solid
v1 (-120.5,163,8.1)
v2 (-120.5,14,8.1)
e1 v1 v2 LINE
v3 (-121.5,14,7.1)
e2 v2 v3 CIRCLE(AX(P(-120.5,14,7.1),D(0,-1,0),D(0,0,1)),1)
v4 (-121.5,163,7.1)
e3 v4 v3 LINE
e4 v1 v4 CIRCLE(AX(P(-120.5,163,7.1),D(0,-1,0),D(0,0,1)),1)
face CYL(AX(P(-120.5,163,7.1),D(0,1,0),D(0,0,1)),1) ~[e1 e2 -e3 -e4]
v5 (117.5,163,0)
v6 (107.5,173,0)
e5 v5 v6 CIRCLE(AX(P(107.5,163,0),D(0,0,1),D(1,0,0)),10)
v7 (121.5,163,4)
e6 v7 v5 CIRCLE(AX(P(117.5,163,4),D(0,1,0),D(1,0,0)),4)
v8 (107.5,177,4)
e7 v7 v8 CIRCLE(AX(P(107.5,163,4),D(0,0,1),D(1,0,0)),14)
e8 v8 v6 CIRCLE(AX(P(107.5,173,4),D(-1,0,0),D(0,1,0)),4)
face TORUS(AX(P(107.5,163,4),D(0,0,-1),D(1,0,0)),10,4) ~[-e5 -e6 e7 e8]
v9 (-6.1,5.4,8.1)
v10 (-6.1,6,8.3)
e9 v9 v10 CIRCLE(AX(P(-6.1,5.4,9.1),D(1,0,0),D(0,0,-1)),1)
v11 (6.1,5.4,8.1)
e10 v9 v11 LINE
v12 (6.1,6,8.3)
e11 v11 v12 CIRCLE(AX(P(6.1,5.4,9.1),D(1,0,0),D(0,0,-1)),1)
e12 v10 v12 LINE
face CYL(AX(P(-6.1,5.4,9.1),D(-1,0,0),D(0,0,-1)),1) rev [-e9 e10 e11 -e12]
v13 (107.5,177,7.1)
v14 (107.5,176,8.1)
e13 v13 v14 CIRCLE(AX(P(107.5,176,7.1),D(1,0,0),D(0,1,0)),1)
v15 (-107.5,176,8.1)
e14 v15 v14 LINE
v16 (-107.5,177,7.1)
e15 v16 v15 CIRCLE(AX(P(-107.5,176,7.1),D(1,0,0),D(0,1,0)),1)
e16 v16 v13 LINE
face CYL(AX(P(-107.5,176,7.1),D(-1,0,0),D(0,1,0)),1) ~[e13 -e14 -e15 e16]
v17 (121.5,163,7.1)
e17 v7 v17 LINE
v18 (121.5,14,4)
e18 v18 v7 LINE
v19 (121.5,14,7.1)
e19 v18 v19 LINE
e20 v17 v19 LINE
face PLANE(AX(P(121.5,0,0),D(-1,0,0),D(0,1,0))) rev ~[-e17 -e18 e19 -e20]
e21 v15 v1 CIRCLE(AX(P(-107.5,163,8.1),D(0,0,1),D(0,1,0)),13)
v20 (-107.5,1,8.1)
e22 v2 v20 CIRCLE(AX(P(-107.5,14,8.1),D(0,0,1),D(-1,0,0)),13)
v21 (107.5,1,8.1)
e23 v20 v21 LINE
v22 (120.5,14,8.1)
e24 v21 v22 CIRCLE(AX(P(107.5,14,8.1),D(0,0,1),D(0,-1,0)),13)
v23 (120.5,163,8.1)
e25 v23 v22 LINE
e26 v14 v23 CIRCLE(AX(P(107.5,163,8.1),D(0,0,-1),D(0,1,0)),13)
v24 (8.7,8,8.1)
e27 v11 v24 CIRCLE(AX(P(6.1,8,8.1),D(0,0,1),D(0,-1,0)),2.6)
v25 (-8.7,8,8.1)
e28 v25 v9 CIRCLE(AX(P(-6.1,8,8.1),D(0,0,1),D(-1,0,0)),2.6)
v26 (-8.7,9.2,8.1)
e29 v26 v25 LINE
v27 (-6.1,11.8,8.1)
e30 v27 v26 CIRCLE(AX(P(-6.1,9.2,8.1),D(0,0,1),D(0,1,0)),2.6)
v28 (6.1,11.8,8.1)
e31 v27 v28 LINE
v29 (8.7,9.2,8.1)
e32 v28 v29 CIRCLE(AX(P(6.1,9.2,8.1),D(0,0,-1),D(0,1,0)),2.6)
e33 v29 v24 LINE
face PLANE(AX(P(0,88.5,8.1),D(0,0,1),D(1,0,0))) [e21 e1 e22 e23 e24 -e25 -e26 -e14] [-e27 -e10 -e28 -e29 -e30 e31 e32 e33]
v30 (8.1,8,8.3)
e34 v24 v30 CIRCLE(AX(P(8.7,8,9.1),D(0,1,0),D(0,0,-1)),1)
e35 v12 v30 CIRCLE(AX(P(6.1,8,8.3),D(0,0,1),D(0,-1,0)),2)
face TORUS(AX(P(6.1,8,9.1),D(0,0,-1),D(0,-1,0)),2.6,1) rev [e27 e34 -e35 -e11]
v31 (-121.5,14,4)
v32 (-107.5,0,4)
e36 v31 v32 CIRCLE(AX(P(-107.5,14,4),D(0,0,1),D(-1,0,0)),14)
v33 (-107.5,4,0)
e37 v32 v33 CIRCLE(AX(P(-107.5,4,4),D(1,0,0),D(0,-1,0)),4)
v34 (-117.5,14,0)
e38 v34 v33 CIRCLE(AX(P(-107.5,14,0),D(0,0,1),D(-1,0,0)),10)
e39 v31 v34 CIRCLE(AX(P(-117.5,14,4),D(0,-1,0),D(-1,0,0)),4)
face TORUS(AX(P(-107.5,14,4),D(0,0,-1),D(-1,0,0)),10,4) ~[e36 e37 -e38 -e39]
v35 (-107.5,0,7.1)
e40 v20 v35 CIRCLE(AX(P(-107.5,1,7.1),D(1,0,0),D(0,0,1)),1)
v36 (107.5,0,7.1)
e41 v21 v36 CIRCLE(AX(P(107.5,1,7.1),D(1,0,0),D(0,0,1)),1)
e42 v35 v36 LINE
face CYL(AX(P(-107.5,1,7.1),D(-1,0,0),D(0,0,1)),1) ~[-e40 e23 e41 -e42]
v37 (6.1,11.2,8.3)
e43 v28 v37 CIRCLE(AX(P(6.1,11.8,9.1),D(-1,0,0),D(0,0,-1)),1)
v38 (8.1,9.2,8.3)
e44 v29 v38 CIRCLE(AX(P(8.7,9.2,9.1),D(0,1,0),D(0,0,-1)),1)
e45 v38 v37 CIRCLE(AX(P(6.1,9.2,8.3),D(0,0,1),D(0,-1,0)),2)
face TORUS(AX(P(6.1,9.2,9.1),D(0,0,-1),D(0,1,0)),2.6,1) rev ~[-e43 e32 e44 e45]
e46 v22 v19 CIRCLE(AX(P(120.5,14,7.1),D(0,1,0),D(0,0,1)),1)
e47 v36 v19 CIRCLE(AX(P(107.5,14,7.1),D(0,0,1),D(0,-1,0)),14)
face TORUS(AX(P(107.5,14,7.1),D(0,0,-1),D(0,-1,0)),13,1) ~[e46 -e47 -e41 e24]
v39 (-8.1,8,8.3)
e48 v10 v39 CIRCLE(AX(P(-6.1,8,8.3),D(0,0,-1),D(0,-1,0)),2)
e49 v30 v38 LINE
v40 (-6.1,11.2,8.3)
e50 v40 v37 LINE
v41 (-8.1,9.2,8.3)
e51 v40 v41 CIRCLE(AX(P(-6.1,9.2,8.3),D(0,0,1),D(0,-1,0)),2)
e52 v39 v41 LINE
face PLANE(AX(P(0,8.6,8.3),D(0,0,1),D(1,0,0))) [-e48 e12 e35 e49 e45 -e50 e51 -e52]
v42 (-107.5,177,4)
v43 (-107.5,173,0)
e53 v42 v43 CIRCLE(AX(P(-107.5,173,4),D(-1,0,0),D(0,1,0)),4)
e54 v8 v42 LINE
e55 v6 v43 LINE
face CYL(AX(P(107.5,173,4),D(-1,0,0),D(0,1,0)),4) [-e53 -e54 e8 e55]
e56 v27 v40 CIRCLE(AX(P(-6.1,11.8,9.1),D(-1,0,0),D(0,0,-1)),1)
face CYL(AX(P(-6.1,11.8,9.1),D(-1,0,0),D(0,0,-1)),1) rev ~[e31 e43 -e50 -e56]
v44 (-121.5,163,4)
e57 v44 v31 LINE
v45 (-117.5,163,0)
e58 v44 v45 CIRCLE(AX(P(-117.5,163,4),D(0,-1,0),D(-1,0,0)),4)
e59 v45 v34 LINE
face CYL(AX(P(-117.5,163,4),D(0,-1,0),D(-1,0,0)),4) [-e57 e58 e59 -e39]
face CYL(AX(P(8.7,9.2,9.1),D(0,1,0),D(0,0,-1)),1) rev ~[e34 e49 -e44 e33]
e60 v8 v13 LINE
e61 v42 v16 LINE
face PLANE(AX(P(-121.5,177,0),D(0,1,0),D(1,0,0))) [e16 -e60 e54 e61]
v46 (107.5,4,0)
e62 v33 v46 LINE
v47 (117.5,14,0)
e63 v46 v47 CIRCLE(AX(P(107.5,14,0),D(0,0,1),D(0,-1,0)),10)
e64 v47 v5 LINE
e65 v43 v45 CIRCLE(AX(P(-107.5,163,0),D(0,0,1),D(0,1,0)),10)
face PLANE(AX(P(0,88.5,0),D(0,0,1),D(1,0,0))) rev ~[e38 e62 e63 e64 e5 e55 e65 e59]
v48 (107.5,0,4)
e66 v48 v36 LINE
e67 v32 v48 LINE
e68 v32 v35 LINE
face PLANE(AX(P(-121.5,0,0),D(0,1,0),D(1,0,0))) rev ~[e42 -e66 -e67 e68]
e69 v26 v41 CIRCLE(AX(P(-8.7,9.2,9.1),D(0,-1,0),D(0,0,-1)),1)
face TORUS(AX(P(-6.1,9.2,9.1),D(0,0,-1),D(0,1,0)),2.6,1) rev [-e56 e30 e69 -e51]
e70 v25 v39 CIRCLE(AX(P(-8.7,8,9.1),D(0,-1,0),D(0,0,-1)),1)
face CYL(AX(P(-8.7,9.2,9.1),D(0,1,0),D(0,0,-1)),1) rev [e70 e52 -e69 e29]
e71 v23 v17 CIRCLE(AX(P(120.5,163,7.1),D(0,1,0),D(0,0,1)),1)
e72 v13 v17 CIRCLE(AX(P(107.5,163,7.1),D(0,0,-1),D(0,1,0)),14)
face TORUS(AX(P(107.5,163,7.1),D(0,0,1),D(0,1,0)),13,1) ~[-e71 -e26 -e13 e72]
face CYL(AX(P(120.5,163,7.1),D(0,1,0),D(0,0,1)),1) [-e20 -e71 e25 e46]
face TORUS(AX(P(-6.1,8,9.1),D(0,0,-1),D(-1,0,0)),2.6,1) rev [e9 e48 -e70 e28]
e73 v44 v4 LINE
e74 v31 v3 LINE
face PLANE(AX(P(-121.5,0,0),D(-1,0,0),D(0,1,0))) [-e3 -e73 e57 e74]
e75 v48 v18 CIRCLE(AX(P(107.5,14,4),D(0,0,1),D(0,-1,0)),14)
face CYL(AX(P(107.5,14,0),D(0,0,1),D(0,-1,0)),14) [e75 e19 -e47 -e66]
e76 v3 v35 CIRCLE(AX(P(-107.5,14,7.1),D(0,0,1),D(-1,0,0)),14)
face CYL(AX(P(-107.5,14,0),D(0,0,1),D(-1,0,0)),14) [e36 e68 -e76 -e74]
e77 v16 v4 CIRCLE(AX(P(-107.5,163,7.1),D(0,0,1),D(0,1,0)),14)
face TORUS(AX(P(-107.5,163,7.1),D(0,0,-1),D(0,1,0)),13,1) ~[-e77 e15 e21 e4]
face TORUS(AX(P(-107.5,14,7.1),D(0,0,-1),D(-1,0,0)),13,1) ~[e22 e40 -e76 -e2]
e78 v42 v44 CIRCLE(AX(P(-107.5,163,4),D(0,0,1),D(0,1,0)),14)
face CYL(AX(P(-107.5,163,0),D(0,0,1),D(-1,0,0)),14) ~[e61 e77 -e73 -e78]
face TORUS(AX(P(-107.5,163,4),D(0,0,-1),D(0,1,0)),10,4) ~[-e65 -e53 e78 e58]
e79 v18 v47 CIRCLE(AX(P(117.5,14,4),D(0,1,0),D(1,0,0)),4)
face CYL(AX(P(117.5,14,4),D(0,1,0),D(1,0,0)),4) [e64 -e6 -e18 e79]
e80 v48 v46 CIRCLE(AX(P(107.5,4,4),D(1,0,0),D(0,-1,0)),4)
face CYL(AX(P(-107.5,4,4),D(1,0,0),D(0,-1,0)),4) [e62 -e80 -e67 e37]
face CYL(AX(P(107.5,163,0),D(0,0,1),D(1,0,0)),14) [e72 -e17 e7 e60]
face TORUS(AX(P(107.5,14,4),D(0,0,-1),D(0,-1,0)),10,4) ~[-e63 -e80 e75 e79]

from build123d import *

# Parameters (mm, degrees)
F0_W         = 243
F0_H         = 177
F1_DEPTH     = 8.1
F2_R         = 14
F3_W         = 16.2
F3_H         = 5.2
F4_DEPTH     = 0.2
F5_R         = 2
F6_R         = 4
F7_T1_DEPTH  = 12.2
F7_T3_DEPTH  = 1.2
F7_T6_ANGLE  = 90
F7_T8_ANGLE  = 90
F7_T10_ANGLE = 90
F7_T12_ANGLE = 90
F7_T13_DEPTH = 215
F7_T15_DEPTH = 149
F7_T18_ANGLE = 90
F7_T20_ANGLE = 90
F7_T22_ANGLE = 90
F7_T24_ANGLE = 90


# Not quite as in the source:
# - a fillet or chamfer that OpenCascade refuses, or shapes differently, is made with other operations: its cross-section is extruded or revolved along the edge and cut away or added


with BuildPart() as f1:
    # F0 (on Top) → F1 (new body)
    with BuildSketch(Plane.XY):
        with Locations((0, 88.5)):
            Rectangle(F0_W, F0_H)
    extrude(amount=F1_DEPTH)

    # F2
    f2_edges = [f1.edges().sort_by_distance(p)[0] for p in [
        (-121.5, 0, 4.05),
        (121.5, 0, 4.05),
        (121.5, 177, 4.05),
        (-121.5, 177, 4.05),
    ]]
    fillet(f2_edges, radius=F2_R)

    # F3 (on face) → F4 (join)
    with BuildSketch(Plane.XY.offset(8.1)):
        with Locations((0, 8.6)):
            Rectangle(F3_W, F3_H)
    extrude(amount=F4_DEPTH)

    # F5
    f5_edges = [f1.edges().sort_by_distance(p)[0] for p in [
        (8.1, 6, 8.2),
        (8.1, 11.2, 8.2),
        (-8.1, 6, 8.2),
        (-8.1, 11.2, 8.2),
    ]]
    fillet(f5_edges, radius=F5_R)

    # F6
    f6_edges = [f1.edges().sort_by_distance(p)[0] for p in [
        (121.5, 88.5, 0),
        (0, 177, 0),
        (117.399495, 172.899495, 0),
        (-117.399495, 172.899495, 0),
        (-121.5, 88.5, 0),
        (117.399495, 4.100505, 0),
        (-117.399495, 4.100505, 0),
        (0, 0, 0),
    ]]
    fillet(f6_edges, radius=F6_R)

    # F7: fillet of radius 1 on 16 edges, made by hand

    # F7_s2 → F7_t1 (join)
    with BuildSketch(Plane.YZ.offset(-6.1)):
        with BuildLine():
            ThreePointArc((11.8, 8.1), (11.483772234, 8.1513167019), (11.2, 8.3))
            Line((11.2, 8.3), (11.2, 8.1))
            Line((11.2, 8.1), (11.8, 8.1))
        make_face()
        with BuildLine():
            ThreePointArc((5.4, 8.1), (5.716227766, 8.1513167019), (6, 8.3))
            Line((6, 8.3), (6, 8.1))
            Line((6, 8.1), (5.4, 8.1))
        make_face()
    extrude(amount=F7_T1_DEPTH)

    # F7_s4 → F7_t3 (join)
    with BuildSketch(Plane.XZ.offset(-9.2)):
        with BuildLine():
            ThreePointArc((8.7, 8.1), (8.383772234, 8.1513167019), (8.1, 8.3))
            Line((8.1, 8.3), (8.1, 8.1))
            Line((8.1, 8.1), (8.7, 8.1))
        make_face()
        with BuildLine():
            ThreePointArc((-8.7, 8.1), (-8.383772234, 8.1513167019), (-8.1, 8.3))
            Line((-8.1, 8.3), (-8.1, 8.1))
            Line((-8.1, 8.1), (-8.7, 8.1))
        make_face()
    extrude(amount=F7_T3_DEPTH)

    # F7_s5 → F7_t6 (revolve)
    with BuildSketch(Plane.YZ.offset(6.1)):
        with BuildLine():
            ThreePointArc((11.8, 8.1), (11.483772234, 8.1513167019), (11.2, 8.3))
            Line((11.2, 8.3), (11.2, 8.1))
            Line((11.2, 8.1), (11.8, 8.1))
        make_face()
    revolve(axis=Axis((6.1, 9.2, 8.1), (0, 0, -1)), revolution_arc=F7_T6_ANGLE)

    # F7_s7 → F7_t8 (revolve)
    with BuildSketch(Plane.YZ.offset(-6.1)):
        with BuildLine():
            ThreePointArc((11.8, 8.1), (11.483772234, 8.1513167019), (11.2, 8.3))
            Line((11.2, 8.3), (11.2, 8.1))
            Line((11.2, 8.1), (11.8, 8.1))
        make_face()
    revolve(axis=Axis((-6.1, 9.2, 8.1), (0, 0, 1)), revolution_arc=F7_T8_ANGLE)

    # F7_s9 → F7_t10 (revolve)
    with BuildSketch(Plane.YZ.offset(6.1)):
        with BuildLine():
            ThreePointArc((5.4, 8.1), (5.716227766, 8.1513167019), (6, 8.3))
            Line((6, 8.3), (6, 8.1))
            Line((6, 8.1), (5.4, 8.1))
        make_face()
    revolve(axis=Axis((6.1, 8, 8.1), (0, 0, 1)), revolution_arc=F7_T10_ANGLE)

    # F7_s11 → F7_t12 (revolve)
    with BuildSketch(Plane.XZ.offset(-8)):
        with BuildLine():
            ThreePointArc((-8.7, 8.1), (-8.383772234, 8.1513167019), (-8.1, 8.3))
            Line((-8.1, 8.3), (-8.1, 8.1))
            Line((-8.1, 8.1), (-8.7, 8.1))
        make_face()
    revolve(axis=Axis((-6.1, 8, 8.1), (0, 0, 1)), revolution_arc=F7_T12_ANGLE)

    # F7_s14 → F7_t13 (cut)
    with BuildSketch(Plane.YZ.offset(-107.5)):
        with BuildLine():
            ThreePointArc((177, 7.1), (176.7071067812, 7.8071067812), (176, 8.1))
            Line((176, 8.1), (177, 8.1))
            Line((177, 8.1), (177, 7.1))
        make_face()
        with BuildLine():
            ThreePointArc((1, 8.1), (0.2928932188, 7.8071067812), (0, 7.1))
            Line((0, 7.1), (0, 8.1))
            Line((0, 8.1), (1, 8.1))
        make_face()
    extrude(amount=F7_T13_DEPTH, mode=Mode.SUBTRACT)

    # F7_s16 → F7_t15 (cut)
    with BuildSketch(Plane.XZ.offset(-163)):
        with BuildLine():
            ThreePointArc((120.5, 8.1), (121.2071067812, 7.8071067812), (121.5, 7.1))
            Line((121.5, 7.1), (121.5, 8.1))
            Line((121.5, 8.1), (120.5, 8.1))
        make_face()
        with BuildLine():
            ThreePointArc((-120.5, 8.1), (-121.2071067812, 7.8071067812), (-121.5, 7.1))
            Line((-121.5, 7.1), (-121.5, 8.1))
            Line((-121.5, 8.1), (-120.5, 8.1))
        make_face()
    extrude(amount=F7_T15_DEPTH, mode=Mode.SUBTRACT)

    # F7_s17 → F7_t18 (revolve, cut)
    with BuildSketch(Plane.YZ.offset(107.5)):
        with BuildLine():
            ThreePointArc((177, 7.1), (176.7071067812, 7.8071067812), (176, 8.1))
            Line((176, 8.1), (177, 8.1))
            Line((177, 8.1), (177, 7.1))
        make_face()
    revolve(axis=Axis((107.5, 163, 8.1), (0, 0, -1)), revolution_arc=F7_T18_ANGLE, mode=Mode.SUBTRACT)

    # F7_s19 → F7_t20 (revolve, cut)
    with BuildSketch(Plane.YZ.offset(-107.5)):
        with BuildLine():
            ThreePointArc((176, 8.1), (176.7071067812, 7.8071067812), (177, 7.1))
            Line((177, 7.1), (177, 8.1))
            Line((177, 8.1), (176, 8.1))
        make_face()
    revolve(axis=Axis((-107.5, 163, 8.1), (0, 0, 1)), revolution_arc=F7_T20_ANGLE, mode=Mode.SUBTRACT)

    # F7_s21 → F7_t22 (revolve, cut)
    with BuildSketch(Plane.YZ.offset(107.5)):
        with BuildLine():
            ThreePointArc((1, 8.1), (0.2928932188, 7.8071067812), (0, 7.1))
            Line((0, 7.1), (0, 8.1))
            Line((0, 8.1), (1, 8.1))
        make_face()
    revolve(axis=Axis((107.5, 14, 8.1), (0, 0, 1)), revolution_arc=F7_T22_ANGLE, mode=Mode.SUBTRACT)

    # F7_s23 → F7_t24 (revolve, cut)
    with BuildSketch(Plane.XZ.offset(-14)):
        with BuildLine():
            ThreePointArc((-120.5, 8.1), (-121.2071067812, 7.8071067812), (-121.5, 7.1))
            Line((-121.5, 7.1), (-121.5, 8.1))
            Line((-121.5, 8.1), (-120.5, 8.1))
        make_face()
    revolve(axis=Axis((-107.5, 14, 8.1), (0, 0, 1)), revolution_arc=F7_T24_ANGLE, mode=Mode.SUBTRACT)


solid = f1.part
